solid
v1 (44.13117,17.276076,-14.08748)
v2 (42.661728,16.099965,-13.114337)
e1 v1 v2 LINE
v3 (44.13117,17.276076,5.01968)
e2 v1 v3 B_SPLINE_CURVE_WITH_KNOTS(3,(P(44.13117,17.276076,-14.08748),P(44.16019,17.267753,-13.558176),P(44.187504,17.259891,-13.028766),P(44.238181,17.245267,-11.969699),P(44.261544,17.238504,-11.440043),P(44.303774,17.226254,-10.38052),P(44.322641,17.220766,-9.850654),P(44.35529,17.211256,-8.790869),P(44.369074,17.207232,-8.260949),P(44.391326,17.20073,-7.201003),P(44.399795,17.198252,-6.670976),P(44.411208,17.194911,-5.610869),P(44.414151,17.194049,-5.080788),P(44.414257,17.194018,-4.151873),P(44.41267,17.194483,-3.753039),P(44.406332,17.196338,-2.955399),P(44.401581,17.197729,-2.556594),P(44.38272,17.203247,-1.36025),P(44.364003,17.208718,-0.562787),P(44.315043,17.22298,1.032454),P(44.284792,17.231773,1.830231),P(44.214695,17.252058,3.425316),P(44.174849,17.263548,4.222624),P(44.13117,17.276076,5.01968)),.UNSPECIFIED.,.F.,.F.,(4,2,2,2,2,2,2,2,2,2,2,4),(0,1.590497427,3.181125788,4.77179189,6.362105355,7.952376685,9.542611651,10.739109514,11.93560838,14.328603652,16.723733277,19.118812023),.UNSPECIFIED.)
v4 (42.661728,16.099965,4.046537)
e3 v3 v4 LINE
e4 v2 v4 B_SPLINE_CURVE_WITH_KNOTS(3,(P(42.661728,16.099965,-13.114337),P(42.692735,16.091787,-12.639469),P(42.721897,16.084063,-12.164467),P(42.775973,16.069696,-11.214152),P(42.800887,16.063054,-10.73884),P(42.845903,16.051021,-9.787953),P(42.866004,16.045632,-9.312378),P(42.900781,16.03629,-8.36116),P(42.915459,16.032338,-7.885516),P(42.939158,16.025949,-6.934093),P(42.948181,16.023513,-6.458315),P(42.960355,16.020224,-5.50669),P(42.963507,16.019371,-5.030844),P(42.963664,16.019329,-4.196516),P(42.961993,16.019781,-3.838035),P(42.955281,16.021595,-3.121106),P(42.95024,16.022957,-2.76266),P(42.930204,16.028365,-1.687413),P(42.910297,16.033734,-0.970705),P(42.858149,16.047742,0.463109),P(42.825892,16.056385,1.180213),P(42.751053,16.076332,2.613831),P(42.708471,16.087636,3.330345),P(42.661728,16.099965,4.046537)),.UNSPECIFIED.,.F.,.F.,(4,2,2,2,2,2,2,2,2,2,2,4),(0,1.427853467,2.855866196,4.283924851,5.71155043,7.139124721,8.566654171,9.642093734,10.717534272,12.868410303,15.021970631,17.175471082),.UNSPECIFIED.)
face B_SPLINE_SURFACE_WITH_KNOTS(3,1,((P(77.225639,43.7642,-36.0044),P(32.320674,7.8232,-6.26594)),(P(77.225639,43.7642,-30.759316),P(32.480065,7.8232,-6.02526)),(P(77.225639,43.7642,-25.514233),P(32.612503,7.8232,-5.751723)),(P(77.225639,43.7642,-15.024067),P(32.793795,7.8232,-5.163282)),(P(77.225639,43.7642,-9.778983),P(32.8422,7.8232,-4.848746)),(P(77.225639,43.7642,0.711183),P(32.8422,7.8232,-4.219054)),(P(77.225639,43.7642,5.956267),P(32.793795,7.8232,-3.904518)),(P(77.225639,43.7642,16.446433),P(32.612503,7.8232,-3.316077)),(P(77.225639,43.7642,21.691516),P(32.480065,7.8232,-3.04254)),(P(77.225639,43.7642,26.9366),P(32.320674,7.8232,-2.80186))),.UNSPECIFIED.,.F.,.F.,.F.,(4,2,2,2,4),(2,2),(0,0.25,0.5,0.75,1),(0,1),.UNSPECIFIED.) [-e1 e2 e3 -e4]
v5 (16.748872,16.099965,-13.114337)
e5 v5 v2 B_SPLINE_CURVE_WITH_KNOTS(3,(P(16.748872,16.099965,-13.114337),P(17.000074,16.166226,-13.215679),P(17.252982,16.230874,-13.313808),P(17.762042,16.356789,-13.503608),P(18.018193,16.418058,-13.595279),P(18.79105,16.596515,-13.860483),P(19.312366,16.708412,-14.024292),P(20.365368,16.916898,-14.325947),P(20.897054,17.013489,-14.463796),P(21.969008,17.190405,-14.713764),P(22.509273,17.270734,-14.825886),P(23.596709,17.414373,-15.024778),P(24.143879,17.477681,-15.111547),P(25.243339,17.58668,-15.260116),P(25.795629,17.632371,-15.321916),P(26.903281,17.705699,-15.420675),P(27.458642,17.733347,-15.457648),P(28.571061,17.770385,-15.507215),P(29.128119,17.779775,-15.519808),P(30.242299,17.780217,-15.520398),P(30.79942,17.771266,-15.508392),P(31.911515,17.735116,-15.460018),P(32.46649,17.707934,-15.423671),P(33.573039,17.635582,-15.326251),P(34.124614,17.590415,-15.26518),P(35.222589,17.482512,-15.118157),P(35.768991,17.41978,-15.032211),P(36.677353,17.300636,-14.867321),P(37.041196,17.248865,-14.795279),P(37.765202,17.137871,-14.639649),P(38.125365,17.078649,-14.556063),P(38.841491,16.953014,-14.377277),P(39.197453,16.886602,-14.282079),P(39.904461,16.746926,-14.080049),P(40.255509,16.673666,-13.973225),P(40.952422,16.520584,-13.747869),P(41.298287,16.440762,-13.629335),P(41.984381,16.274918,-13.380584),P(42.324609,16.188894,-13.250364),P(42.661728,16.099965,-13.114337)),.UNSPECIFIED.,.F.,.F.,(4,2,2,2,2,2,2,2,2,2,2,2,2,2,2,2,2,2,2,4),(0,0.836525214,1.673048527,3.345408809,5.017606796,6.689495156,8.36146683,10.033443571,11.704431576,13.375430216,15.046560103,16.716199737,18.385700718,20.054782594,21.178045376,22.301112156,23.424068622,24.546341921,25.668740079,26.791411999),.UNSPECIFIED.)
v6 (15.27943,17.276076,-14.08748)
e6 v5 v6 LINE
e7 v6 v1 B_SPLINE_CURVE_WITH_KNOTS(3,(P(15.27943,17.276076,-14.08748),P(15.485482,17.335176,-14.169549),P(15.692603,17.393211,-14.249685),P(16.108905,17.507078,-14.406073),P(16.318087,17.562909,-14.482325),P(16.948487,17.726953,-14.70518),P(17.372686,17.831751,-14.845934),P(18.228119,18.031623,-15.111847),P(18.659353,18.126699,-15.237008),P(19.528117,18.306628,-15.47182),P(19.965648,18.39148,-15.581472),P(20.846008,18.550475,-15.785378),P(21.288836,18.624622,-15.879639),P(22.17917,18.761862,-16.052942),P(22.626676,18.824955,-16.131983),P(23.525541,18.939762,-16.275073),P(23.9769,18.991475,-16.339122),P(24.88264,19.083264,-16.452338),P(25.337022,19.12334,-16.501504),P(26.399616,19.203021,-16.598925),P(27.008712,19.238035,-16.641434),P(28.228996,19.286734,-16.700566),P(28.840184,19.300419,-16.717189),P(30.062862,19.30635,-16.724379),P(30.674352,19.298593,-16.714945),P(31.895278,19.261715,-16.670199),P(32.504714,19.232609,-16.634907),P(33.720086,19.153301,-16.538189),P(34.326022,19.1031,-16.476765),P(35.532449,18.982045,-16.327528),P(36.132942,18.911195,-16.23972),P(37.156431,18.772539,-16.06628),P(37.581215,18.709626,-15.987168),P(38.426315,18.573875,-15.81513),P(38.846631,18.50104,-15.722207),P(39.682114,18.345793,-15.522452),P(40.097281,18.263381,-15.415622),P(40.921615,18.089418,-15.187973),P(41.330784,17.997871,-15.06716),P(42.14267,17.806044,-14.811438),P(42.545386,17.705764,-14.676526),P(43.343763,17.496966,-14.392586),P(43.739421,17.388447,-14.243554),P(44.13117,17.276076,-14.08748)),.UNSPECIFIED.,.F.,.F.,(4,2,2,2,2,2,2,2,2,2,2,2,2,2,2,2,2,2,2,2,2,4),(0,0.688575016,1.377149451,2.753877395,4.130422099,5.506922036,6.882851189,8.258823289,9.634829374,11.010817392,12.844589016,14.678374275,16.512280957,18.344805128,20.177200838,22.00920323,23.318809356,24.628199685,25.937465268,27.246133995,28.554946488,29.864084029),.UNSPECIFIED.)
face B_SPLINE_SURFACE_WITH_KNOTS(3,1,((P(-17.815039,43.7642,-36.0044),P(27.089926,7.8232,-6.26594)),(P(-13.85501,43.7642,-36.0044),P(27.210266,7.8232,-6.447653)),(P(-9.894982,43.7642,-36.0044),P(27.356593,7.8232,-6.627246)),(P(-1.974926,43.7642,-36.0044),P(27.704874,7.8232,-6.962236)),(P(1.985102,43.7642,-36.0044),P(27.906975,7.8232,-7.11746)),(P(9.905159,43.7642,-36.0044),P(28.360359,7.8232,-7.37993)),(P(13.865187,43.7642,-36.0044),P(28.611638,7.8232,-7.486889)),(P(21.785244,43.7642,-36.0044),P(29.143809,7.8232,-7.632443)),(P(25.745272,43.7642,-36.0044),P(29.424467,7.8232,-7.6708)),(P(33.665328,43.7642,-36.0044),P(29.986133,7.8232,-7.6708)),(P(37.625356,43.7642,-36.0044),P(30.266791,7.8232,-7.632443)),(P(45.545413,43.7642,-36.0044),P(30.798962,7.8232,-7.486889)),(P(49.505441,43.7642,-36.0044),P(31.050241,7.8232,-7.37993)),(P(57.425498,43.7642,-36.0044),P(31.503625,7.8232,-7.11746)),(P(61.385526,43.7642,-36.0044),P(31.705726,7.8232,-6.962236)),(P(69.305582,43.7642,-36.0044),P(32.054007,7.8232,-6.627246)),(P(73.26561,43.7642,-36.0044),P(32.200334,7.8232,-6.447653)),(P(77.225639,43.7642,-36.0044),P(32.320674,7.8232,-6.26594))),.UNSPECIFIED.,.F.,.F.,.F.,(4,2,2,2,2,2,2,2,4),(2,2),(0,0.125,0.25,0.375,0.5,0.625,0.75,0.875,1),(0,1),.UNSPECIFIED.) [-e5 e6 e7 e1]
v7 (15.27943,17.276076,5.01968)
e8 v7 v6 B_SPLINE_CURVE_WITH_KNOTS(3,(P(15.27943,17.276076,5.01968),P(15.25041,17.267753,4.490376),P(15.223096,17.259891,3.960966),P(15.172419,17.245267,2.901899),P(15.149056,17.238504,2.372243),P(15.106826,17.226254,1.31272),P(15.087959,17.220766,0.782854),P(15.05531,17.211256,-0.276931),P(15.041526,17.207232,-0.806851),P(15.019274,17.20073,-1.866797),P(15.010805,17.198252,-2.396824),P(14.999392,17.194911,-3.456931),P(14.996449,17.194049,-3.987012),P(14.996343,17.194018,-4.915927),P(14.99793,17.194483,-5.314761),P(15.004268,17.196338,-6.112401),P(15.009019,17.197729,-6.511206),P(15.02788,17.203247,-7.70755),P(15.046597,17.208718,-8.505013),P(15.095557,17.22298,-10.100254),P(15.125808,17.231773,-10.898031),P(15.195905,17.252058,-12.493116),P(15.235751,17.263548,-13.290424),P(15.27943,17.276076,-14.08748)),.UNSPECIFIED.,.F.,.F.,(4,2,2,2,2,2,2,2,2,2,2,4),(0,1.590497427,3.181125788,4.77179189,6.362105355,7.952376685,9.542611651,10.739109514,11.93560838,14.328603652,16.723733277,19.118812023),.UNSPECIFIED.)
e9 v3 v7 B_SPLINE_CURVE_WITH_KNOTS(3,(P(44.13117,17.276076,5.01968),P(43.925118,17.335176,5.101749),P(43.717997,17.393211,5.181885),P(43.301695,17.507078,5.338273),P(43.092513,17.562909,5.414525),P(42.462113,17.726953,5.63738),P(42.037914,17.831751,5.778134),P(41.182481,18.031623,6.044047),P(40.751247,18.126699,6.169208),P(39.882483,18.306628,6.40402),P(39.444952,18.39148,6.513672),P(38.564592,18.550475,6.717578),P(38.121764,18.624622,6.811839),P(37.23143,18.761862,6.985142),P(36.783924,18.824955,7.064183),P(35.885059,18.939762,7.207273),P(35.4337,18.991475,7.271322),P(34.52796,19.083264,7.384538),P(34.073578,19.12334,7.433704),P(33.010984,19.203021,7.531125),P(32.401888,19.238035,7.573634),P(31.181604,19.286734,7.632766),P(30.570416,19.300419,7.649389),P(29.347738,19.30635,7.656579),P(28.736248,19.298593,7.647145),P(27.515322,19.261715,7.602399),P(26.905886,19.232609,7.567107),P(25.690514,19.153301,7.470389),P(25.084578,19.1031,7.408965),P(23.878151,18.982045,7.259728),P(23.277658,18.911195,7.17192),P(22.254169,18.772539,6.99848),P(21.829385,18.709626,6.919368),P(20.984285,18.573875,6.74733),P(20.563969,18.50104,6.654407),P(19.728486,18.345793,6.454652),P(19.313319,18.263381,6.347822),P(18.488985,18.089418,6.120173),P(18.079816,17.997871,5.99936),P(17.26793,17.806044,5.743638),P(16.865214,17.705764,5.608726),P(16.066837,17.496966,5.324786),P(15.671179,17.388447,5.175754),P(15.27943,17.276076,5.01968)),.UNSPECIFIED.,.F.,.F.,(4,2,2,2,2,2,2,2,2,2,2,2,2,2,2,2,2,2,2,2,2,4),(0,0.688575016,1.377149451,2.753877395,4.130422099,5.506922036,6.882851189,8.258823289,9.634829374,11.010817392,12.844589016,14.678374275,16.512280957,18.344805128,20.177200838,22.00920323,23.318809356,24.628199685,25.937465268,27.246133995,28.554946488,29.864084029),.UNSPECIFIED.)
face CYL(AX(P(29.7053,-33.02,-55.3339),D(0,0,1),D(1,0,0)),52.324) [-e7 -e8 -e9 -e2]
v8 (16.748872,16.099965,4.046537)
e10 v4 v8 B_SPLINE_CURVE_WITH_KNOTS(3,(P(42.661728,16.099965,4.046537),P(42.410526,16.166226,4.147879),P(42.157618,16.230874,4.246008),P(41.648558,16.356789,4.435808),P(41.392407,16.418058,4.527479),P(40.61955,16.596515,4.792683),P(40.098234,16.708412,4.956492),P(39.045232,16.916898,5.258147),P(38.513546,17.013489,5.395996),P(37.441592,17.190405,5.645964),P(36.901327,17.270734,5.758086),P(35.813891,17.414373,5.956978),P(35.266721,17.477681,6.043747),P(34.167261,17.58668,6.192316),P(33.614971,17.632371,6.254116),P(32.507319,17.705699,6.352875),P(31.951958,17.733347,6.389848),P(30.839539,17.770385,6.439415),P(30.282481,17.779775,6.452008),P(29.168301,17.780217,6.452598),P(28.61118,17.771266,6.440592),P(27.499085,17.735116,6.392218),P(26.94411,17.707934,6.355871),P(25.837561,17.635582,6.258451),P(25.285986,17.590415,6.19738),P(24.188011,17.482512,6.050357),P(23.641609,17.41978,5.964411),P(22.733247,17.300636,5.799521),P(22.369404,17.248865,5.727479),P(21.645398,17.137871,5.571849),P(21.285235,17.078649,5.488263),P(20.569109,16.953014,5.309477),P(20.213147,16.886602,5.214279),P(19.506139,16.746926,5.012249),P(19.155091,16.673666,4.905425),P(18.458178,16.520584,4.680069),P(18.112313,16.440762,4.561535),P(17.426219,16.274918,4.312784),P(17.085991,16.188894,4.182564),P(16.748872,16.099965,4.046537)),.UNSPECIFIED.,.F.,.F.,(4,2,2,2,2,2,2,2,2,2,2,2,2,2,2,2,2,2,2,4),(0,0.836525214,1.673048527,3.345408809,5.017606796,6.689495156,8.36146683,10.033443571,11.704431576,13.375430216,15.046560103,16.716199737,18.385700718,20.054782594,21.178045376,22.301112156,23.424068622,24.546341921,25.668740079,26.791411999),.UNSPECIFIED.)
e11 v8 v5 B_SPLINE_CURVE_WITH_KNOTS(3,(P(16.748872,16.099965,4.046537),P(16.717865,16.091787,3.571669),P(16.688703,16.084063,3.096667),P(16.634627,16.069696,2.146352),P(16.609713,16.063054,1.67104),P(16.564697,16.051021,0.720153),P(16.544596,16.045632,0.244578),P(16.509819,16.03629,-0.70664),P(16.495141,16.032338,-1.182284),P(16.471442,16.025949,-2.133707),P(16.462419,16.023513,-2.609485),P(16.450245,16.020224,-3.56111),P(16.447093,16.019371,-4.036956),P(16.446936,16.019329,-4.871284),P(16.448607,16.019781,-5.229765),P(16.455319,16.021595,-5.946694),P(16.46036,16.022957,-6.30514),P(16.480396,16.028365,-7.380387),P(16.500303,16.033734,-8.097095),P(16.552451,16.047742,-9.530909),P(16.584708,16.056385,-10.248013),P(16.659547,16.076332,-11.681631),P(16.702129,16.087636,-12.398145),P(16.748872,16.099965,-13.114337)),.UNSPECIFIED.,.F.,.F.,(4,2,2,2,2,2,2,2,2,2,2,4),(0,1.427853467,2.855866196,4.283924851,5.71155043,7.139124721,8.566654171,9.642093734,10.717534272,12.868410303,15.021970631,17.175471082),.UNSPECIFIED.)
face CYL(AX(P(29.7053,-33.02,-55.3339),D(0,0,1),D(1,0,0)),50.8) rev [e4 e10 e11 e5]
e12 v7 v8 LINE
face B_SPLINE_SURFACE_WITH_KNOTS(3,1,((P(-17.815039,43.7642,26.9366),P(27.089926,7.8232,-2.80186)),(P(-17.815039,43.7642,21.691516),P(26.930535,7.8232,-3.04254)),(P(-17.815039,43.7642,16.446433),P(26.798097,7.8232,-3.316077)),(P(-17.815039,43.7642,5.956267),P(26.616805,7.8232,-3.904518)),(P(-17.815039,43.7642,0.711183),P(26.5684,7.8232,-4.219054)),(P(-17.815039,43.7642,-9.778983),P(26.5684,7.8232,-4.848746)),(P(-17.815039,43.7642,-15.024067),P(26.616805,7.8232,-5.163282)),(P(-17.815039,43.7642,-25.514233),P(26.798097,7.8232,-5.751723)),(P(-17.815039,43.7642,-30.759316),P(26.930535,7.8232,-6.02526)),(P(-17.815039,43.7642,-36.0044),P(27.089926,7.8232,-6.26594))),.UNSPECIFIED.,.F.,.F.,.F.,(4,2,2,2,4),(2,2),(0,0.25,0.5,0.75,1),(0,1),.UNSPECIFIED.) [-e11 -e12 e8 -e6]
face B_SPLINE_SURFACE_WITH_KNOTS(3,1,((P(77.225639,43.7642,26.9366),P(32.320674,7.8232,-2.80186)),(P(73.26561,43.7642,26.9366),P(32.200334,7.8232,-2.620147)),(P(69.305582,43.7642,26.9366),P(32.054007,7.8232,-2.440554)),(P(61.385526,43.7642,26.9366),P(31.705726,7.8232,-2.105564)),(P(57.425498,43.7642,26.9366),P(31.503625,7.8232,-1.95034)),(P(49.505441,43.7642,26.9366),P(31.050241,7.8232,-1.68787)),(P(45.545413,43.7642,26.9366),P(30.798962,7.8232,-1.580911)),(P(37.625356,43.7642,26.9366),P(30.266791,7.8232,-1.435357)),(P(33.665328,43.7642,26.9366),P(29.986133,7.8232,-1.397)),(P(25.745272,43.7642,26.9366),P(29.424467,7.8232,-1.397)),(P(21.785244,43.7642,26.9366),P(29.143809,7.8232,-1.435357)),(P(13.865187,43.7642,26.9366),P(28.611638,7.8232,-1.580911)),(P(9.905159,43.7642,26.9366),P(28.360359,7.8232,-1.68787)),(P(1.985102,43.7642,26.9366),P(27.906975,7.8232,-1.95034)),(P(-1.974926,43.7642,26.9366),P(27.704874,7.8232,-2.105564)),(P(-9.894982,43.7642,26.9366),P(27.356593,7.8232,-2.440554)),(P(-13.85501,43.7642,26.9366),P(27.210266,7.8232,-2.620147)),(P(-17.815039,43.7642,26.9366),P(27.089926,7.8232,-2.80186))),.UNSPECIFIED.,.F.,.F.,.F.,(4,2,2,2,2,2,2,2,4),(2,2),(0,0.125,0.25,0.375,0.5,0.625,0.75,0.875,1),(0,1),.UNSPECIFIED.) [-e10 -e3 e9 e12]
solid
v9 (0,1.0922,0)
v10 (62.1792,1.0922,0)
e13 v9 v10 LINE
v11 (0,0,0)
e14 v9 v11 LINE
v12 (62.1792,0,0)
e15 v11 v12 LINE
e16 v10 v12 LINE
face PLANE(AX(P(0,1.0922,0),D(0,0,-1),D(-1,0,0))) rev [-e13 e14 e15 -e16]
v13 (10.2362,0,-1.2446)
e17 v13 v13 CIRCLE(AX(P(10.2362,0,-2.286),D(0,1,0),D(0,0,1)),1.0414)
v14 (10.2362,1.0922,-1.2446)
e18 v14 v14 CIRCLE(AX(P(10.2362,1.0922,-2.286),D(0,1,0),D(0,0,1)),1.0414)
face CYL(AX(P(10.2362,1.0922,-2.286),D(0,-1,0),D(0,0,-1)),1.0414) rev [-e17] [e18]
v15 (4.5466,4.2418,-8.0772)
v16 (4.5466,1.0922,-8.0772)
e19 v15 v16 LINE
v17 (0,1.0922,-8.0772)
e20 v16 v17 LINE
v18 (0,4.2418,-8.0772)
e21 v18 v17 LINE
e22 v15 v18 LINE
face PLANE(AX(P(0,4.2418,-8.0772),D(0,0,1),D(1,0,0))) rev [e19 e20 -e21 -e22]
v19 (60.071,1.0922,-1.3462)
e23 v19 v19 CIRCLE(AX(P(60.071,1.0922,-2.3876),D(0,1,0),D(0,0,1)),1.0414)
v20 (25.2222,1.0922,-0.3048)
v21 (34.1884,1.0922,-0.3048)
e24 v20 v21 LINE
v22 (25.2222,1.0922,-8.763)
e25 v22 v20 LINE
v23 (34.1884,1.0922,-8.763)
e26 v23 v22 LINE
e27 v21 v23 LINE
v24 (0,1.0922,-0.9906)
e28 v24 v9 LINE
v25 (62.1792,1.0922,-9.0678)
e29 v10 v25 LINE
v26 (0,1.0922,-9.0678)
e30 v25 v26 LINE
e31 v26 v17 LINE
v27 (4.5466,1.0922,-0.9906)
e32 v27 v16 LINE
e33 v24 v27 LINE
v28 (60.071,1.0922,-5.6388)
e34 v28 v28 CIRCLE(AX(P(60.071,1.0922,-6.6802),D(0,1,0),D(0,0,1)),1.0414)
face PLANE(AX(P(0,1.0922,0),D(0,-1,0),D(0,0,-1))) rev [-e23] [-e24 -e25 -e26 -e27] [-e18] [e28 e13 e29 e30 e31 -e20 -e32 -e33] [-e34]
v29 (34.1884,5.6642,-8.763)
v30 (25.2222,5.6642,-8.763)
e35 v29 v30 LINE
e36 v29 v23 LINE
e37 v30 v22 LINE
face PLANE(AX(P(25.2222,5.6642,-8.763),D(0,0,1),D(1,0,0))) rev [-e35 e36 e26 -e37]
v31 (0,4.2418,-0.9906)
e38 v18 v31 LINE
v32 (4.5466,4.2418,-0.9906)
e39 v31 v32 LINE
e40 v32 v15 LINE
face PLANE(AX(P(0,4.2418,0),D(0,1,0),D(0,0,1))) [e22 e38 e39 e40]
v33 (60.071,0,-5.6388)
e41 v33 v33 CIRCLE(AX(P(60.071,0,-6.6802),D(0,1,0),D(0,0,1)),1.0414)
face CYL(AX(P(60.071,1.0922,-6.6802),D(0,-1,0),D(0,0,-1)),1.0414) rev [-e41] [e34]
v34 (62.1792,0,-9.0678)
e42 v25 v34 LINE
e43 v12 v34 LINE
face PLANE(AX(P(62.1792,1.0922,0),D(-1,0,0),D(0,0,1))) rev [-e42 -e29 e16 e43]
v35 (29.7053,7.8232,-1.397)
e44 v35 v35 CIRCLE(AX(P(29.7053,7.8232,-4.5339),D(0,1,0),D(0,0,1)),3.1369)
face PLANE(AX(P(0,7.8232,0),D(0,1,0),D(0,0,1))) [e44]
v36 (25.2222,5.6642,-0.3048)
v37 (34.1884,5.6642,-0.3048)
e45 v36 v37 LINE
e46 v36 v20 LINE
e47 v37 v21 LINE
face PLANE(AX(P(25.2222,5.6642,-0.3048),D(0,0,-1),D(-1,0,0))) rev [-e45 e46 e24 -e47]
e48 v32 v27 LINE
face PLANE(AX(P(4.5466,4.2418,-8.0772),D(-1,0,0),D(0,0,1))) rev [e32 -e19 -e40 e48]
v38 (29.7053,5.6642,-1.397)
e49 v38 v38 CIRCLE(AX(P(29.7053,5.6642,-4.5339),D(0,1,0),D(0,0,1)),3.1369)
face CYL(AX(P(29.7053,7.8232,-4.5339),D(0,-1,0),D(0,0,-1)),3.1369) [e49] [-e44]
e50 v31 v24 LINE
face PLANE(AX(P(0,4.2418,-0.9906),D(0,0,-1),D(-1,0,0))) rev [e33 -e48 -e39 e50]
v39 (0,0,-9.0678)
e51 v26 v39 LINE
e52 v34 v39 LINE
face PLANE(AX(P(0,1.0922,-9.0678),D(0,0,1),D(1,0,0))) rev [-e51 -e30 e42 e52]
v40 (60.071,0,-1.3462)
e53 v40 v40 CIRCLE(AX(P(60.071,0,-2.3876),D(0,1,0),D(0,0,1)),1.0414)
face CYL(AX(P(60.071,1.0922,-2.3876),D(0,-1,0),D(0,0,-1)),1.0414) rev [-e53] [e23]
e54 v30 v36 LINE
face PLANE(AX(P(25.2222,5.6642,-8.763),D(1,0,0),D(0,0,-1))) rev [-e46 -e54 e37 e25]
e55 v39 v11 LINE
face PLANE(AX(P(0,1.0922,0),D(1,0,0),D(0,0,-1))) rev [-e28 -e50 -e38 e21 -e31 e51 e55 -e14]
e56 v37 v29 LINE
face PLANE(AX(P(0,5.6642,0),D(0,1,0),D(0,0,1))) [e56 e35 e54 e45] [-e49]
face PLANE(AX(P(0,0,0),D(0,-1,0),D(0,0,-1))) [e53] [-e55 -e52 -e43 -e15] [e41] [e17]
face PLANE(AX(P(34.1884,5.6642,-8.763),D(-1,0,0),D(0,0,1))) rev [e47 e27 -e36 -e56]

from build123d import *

# Parameters (mm, degrees)
SKETCH1_W                = 62.1792
SKETCH1_H                = 9.0678
SKETCH1_R                = 1.0414
BOSS_EXTRUDE1_DEPTH      = 1.0922
SKETCH2_W                = 4.5466
SKETCH2_H                = 7.0866
BOSS_EXTRUDE2_DEPTH      = 3.1496
SKETCH3_W                = 8.9662
SKETCH3_H                = 8.4582
BOSS_EXTRUDE3_DEPTH      = 4.572
BOSS_EXTRUDE4_DEPTH      = 2.159
BOSS_EXTRUDE5_DEPTH      = 50.8
BOSS_EXTRUDE5_DEPTH_BACK = 50.8
SKETCH11_R               = 52.324
SKETCH11_R_2             = 50.8


with BuildPart() as part:
    # Sketch1 → Boss-Extrude1 (new body)
    with BuildSketch(Plane(origin=(0, 0, 0), x_dir=(1, 0, 0), z_dir=(0, 1, 0))):
        with Locations((31.0896, 4.5339)):
            Rectangle(SKETCH1_W, SKETCH1_H)
        with Locations(Location((10.2362, 2.286, 0), (0, 0, 270))):
            Circle(SKETCH1_R, mode=Mode.SUBTRACT)
        with Locations(Location((60.071, 6.6802, 0), (0, 0, 270))):
            Circle(SKETCH1_R, mode=Mode.SUBTRACT)
        with Locations(Location((60.071, 2.3876, 0), (0, 0, 270))):
            Circle(SKETCH1_R, mode=Mode.SUBTRACT)
    extrude(amount=BOSS_EXTRUDE1_DEPTH)

    # Sketch2 → Boss-Extrude2 (add)
    with BuildSketch(Plane(origin=(0, 1.0922, 0), x_dir=(1, 0, 0), z_dir=(0, 1, 0))):
        with Locations((2.2733, 4.5339)):
            Rectangle(SKETCH2_W, SKETCH2_H)
    extrude(amount=BOSS_EXTRUDE2_DEPTH)

    # Sketch3 → Boss-Extrude3 (add)
    with BuildSketch(Plane(origin=(0, 1.0922, 0), x_dir=(1, 0, 0), z_dir=(0, 1, 0))):
        with Locations((29.7053, 4.5339)):
            Rectangle(SKETCH3_W, SKETCH3_H)
    extrude(amount=BOSS_EXTRUDE3_DEPTH)

    # Sketch4 → Boss-Extrude4 (add)
    with BuildSketch(Plane(origin=(0, 5.6642, 0), x_dir=(1, 0, 0), z_dir=(0, 1, 0))):
        with BuildLine():
            ThreePointArc((32.8422, 4.5339), (30.863379034, 7.449203511), (27.423477974, 6.686440325))
            Line((27.423477974, 6.686440325), (31.987122026, 2.381359675))
            ThreePointArc((31.987122026, 2.381359675), (32.620603511, 3.375820966), (32.8422, 4.5339))
        make_face()
        with BuildLine():
            Line((31.987122026, 2.381359675), (27.423477974, 6.686440325))
            ThreePointArc((27.423477974, 6.686440325), (27.552759675, 2.252077974), (31.987122026, 2.381359675))
        make_face()
    extrude(amount=BOSS_EXTRUDE4_DEPTH)


with BuildPart() as body_2:
    # Loft1: read off the stored shape, not the designer's step
    # Loft1: loft between two sections, ruled curve by curve
    loft1_from = [
        Edge.make_bspline([(-17.815038703, 43.7642, -36.004399795), (-13.855010478, 43.7642, -36.004399795), (-9.894982253, 43.7642, -36.004399795), (-1.974925802, 43.7642, -36.004399795), (1.985102423, 43.7642, -36.004399795), (9.905158874, 43.7642, -36.004399795), (13.865187099, 43.7642, -36.004399795), (21.785243549, 43.7642, -36.004399795), (25.745271775, 43.7642, -36.004399795), (33.665328225, 43.7642, -36.004399795), (37.625356451, 43.7642, -36.004399795), (45.545412901, 43.7642, -36.004399795), (49.505441126, 43.7642, -36.004399795), (57.425497577, 43.7642, -36.004399795), (61.385525802, 43.7642, -36.004399795), (69.305582253, 43.7642, -36.004399795), (73.265610478, 43.7642, -36.004399795), (77.225638703, 43.7642, -36.004399795)], [0, 0, 0, 0, 0.125, 0.125, 0.25, 0.25, 0.375, 0.375, 0.5, 0.5, 0.625, 0.625, 0.75, 0.75, 0.875, 0.875, 1, 1, 1, 1], 3),
        Edge.make_bspline([(77.225638703, 43.7642, -36.004399795), (77.225638703, 43.7642, -30.759316496), (77.225638703, 43.7642, -25.514233197), (77.225638703, 43.7642, -15.024066598), (77.225638703, 43.7642, -9.778983299), (77.225638703, 43.7642, 0.711183299), (77.225638703, 43.7642, 5.956266598), (77.225638703, 43.7642, 16.446433197), (77.225638703, 43.7642, 21.691516496), (77.225638703, 43.7642, 26.936599795)], [0, 0, 0, 0, 0.25, 0.25, 0.5, 0.5, 0.75, 0.75, 1, 1, 1, 1], 3),
        Edge.make_bspline([(-17.815038703, 43.7642, 26.936599795), (-17.815038703, 43.7642, 21.691516496), (-17.815038703, 43.7642, 16.446433197), (-17.815038703, 43.7642, 5.956266598), (-17.815038703, 43.7642, 0.711183299), (-17.815038703, 43.7642, -9.778983299), (-17.815038703, 43.7642, -15.024066598), (-17.815038703, 43.7642, -25.514233197), (-17.815038703, 43.7642, -30.759316496), (-17.815038703, 43.7642, -36.004399795)], [0, 0, 0, 0, 0.25, 0.25, 0.5, 0.5, 0.75, 0.75, 1, 1, 1, 1], 3),
        Edge.make_bspline([(77.225638703, 43.7642, 26.936599795), (73.265610478, 43.7642, 26.936599795), (69.305582253, 43.7642, 26.936599795), (61.385525802, 43.7642, 26.936599795), (57.425497577, 43.7642, 26.936599795), (49.505441126, 43.7642, 26.936599795), (45.545412901, 43.7642, 26.936599795), (37.625356451, 43.7642, 26.936599795), (33.665328225, 43.7642, 26.936599795), (25.745271775, 43.7642, 26.936599795), (21.785243549, 43.7642, 26.936599795), (13.865187099, 43.7642, 26.936599795), (9.905158874, 43.7642, 26.936599795), (1.985102423, 43.7642, 26.936599795), (-1.974925802, 43.7642, 26.936599795), (-9.894982253, 43.7642, 26.936599795), (-13.855010478, 43.7642, 26.936599795), (-17.815038703, 43.7642, 26.936599795)], [0, 0, 0, 0, 0.125, 0.125, 0.25, 0.25, 0.375, 0.375, 0.5, 0.5, 0.625, 0.625, 0.75, 0.75, 0.875, 0.875, 1, 1, 1, 1], 3),
    ]
    loft1_to = [
        Edge.make_bspline([(27.089926276, 7.8232, -6.265939807), (27.210266192, 7.8232, -6.447652637), (27.356593228, 7.8232, -6.627246031), (27.704874025, 7.8232, -6.962236266), (27.906975354, 7.8232, -7.117459947), (28.360359335, 7.8232, -7.379930242), (28.611638214, 7.8232, -7.486888917), (29.143809422, 7.8232, -7.63244288), (29.424466589, 7.8232, -7.6708), (29.986133411, 7.8232, -7.6708), (30.266790578, 7.8232, -7.63244288), (30.798961786, 7.8232, -7.486888917), (31.050240665, 7.8232, -7.379930242), (31.503624646, 7.8232, -7.117459947), (31.705725975, 7.8232, -6.962236266), (32.054006772, 7.8232, -6.627246031), (32.200333808, 7.8232, -6.447652637), (32.320673724, 7.8232, -6.265939807)], [0, 0, 0, 0, 0.125, 0.125, 0.25, 0.25, 0.375, 0.375, 0.5, 0.5, 0.625, 0.625, 0.75, 0.75, 0.875, 0.875, 1, 1, 1, 1], 3),
        Edge.make_bspline([(32.320673724, 7.8232, -6.265939807), (32.480064731, 7.8232, -6.025259974), (32.612503267, 7.8232, -5.751723137), (32.793795146, 7.8232, -5.163282045), (32.8422, 7.8232, -4.848745684), (32.8422, 7.8232, -4.219054316), (32.793795146, 7.8232, -3.904517955), (32.612503267, 7.8232, -3.316076863), (32.480064731, 7.8232, -3.042540026), (32.320673724, 7.8232, -2.801860193)], [0, 0, 0, 0, 0.25, 0.25, 0.5, 0.5, 0.75, 0.75, 1, 1, 1, 1], 3),
        Edge.make_bspline([(27.089926276, 7.8232, -2.801860193), (26.930535269, 7.8232, -3.042540026), (26.798096733, 7.8232, -3.316076863), (26.616804854, 7.8232, -3.904517955), (26.5684, 7.8232, -4.219054316), (26.5684, 7.8232, -4.848745684), (26.616804854, 7.8232, -5.163282045), (26.798096733, 7.8232, -5.751723137), (26.930535269, 7.8232, -6.025259974), (27.089926276, 7.8232, -6.265939807)], [0, 0, 0, 0, 0.25, 0.25, 0.5, 0.5, 0.75, 0.75, 1, 1, 1, 1], 3),
        Edge.make_bspline([(32.320673724, 7.8232, -2.801860193), (32.200333808, 7.8232, -2.620147363), (32.054006772, 7.8232, -2.440553969), (31.705725975, 7.8232, -2.105563734), (31.503624646, 7.8232, -1.950340053), (31.050240665, 7.8232, -1.687869758), (30.798961786, 7.8232, -1.580911083), (30.266790578, 7.8232, -1.43535712), (29.986133411, 7.8232, -1.397), (29.424466589, 7.8232, -1.397), (29.143809422, 7.8232, -1.43535712), (28.611638214, 7.8232, -1.580911083), (28.360359335, 7.8232, -1.687869758), (27.906975354, 7.8232, -1.950340053), (27.704874025, 7.8232, -2.105563734), (27.356593228, 7.8232, -2.440553969), (27.210266192, 7.8232, -2.620147363), (27.089926276, 7.8232, -2.801860193)], [0, 0, 0, 0, 0.125, 0.125, 0.25, 0.25, 0.375, 0.375, 0.5, 0.5, 0.625, 0.625, 0.75, 0.75, 0.875, 0.875, 1, 1, 1, 1], 3),
    ]
    loft1 = Solid(Shell([*[Face.make_surface_from_curves(loft1_from[k], loft1_to[k]) for k in range(4)], Face(Wire(loft1_from)), Face(Wire(loft1_to))]))
    add(loft1)


with BuildPart() as body_3:
    # Sketch11 → Boss-Extrude5 (new, two sides: drawn at the far end of the back side and taken through both)
    with BuildSketch(Plane.XY.offset(-4.5339).offset(-BOSS_EXTRUDE5_DEPTH_BACK)):
        with Locations((29.7053, -33.02)):
            Circle(SKETCH11_R)
        with Locations((29.7053, -33.02)):
            Circle(SKETCH11_R_2, mode=Mode.SUBTRACT)
    extrude(amount=BOSS_EXTRUDE5_DEPTH + BOSS_EXTRUDE5_DEPTH_BACK)


with BuildPart() as body_2_1:
    add(body_2.part)

    # Combine1: intersect body 3
    add(body_3.part, mode=Mode.INTERSECT)


solid = Compound([part.part, body_2_1.part])
